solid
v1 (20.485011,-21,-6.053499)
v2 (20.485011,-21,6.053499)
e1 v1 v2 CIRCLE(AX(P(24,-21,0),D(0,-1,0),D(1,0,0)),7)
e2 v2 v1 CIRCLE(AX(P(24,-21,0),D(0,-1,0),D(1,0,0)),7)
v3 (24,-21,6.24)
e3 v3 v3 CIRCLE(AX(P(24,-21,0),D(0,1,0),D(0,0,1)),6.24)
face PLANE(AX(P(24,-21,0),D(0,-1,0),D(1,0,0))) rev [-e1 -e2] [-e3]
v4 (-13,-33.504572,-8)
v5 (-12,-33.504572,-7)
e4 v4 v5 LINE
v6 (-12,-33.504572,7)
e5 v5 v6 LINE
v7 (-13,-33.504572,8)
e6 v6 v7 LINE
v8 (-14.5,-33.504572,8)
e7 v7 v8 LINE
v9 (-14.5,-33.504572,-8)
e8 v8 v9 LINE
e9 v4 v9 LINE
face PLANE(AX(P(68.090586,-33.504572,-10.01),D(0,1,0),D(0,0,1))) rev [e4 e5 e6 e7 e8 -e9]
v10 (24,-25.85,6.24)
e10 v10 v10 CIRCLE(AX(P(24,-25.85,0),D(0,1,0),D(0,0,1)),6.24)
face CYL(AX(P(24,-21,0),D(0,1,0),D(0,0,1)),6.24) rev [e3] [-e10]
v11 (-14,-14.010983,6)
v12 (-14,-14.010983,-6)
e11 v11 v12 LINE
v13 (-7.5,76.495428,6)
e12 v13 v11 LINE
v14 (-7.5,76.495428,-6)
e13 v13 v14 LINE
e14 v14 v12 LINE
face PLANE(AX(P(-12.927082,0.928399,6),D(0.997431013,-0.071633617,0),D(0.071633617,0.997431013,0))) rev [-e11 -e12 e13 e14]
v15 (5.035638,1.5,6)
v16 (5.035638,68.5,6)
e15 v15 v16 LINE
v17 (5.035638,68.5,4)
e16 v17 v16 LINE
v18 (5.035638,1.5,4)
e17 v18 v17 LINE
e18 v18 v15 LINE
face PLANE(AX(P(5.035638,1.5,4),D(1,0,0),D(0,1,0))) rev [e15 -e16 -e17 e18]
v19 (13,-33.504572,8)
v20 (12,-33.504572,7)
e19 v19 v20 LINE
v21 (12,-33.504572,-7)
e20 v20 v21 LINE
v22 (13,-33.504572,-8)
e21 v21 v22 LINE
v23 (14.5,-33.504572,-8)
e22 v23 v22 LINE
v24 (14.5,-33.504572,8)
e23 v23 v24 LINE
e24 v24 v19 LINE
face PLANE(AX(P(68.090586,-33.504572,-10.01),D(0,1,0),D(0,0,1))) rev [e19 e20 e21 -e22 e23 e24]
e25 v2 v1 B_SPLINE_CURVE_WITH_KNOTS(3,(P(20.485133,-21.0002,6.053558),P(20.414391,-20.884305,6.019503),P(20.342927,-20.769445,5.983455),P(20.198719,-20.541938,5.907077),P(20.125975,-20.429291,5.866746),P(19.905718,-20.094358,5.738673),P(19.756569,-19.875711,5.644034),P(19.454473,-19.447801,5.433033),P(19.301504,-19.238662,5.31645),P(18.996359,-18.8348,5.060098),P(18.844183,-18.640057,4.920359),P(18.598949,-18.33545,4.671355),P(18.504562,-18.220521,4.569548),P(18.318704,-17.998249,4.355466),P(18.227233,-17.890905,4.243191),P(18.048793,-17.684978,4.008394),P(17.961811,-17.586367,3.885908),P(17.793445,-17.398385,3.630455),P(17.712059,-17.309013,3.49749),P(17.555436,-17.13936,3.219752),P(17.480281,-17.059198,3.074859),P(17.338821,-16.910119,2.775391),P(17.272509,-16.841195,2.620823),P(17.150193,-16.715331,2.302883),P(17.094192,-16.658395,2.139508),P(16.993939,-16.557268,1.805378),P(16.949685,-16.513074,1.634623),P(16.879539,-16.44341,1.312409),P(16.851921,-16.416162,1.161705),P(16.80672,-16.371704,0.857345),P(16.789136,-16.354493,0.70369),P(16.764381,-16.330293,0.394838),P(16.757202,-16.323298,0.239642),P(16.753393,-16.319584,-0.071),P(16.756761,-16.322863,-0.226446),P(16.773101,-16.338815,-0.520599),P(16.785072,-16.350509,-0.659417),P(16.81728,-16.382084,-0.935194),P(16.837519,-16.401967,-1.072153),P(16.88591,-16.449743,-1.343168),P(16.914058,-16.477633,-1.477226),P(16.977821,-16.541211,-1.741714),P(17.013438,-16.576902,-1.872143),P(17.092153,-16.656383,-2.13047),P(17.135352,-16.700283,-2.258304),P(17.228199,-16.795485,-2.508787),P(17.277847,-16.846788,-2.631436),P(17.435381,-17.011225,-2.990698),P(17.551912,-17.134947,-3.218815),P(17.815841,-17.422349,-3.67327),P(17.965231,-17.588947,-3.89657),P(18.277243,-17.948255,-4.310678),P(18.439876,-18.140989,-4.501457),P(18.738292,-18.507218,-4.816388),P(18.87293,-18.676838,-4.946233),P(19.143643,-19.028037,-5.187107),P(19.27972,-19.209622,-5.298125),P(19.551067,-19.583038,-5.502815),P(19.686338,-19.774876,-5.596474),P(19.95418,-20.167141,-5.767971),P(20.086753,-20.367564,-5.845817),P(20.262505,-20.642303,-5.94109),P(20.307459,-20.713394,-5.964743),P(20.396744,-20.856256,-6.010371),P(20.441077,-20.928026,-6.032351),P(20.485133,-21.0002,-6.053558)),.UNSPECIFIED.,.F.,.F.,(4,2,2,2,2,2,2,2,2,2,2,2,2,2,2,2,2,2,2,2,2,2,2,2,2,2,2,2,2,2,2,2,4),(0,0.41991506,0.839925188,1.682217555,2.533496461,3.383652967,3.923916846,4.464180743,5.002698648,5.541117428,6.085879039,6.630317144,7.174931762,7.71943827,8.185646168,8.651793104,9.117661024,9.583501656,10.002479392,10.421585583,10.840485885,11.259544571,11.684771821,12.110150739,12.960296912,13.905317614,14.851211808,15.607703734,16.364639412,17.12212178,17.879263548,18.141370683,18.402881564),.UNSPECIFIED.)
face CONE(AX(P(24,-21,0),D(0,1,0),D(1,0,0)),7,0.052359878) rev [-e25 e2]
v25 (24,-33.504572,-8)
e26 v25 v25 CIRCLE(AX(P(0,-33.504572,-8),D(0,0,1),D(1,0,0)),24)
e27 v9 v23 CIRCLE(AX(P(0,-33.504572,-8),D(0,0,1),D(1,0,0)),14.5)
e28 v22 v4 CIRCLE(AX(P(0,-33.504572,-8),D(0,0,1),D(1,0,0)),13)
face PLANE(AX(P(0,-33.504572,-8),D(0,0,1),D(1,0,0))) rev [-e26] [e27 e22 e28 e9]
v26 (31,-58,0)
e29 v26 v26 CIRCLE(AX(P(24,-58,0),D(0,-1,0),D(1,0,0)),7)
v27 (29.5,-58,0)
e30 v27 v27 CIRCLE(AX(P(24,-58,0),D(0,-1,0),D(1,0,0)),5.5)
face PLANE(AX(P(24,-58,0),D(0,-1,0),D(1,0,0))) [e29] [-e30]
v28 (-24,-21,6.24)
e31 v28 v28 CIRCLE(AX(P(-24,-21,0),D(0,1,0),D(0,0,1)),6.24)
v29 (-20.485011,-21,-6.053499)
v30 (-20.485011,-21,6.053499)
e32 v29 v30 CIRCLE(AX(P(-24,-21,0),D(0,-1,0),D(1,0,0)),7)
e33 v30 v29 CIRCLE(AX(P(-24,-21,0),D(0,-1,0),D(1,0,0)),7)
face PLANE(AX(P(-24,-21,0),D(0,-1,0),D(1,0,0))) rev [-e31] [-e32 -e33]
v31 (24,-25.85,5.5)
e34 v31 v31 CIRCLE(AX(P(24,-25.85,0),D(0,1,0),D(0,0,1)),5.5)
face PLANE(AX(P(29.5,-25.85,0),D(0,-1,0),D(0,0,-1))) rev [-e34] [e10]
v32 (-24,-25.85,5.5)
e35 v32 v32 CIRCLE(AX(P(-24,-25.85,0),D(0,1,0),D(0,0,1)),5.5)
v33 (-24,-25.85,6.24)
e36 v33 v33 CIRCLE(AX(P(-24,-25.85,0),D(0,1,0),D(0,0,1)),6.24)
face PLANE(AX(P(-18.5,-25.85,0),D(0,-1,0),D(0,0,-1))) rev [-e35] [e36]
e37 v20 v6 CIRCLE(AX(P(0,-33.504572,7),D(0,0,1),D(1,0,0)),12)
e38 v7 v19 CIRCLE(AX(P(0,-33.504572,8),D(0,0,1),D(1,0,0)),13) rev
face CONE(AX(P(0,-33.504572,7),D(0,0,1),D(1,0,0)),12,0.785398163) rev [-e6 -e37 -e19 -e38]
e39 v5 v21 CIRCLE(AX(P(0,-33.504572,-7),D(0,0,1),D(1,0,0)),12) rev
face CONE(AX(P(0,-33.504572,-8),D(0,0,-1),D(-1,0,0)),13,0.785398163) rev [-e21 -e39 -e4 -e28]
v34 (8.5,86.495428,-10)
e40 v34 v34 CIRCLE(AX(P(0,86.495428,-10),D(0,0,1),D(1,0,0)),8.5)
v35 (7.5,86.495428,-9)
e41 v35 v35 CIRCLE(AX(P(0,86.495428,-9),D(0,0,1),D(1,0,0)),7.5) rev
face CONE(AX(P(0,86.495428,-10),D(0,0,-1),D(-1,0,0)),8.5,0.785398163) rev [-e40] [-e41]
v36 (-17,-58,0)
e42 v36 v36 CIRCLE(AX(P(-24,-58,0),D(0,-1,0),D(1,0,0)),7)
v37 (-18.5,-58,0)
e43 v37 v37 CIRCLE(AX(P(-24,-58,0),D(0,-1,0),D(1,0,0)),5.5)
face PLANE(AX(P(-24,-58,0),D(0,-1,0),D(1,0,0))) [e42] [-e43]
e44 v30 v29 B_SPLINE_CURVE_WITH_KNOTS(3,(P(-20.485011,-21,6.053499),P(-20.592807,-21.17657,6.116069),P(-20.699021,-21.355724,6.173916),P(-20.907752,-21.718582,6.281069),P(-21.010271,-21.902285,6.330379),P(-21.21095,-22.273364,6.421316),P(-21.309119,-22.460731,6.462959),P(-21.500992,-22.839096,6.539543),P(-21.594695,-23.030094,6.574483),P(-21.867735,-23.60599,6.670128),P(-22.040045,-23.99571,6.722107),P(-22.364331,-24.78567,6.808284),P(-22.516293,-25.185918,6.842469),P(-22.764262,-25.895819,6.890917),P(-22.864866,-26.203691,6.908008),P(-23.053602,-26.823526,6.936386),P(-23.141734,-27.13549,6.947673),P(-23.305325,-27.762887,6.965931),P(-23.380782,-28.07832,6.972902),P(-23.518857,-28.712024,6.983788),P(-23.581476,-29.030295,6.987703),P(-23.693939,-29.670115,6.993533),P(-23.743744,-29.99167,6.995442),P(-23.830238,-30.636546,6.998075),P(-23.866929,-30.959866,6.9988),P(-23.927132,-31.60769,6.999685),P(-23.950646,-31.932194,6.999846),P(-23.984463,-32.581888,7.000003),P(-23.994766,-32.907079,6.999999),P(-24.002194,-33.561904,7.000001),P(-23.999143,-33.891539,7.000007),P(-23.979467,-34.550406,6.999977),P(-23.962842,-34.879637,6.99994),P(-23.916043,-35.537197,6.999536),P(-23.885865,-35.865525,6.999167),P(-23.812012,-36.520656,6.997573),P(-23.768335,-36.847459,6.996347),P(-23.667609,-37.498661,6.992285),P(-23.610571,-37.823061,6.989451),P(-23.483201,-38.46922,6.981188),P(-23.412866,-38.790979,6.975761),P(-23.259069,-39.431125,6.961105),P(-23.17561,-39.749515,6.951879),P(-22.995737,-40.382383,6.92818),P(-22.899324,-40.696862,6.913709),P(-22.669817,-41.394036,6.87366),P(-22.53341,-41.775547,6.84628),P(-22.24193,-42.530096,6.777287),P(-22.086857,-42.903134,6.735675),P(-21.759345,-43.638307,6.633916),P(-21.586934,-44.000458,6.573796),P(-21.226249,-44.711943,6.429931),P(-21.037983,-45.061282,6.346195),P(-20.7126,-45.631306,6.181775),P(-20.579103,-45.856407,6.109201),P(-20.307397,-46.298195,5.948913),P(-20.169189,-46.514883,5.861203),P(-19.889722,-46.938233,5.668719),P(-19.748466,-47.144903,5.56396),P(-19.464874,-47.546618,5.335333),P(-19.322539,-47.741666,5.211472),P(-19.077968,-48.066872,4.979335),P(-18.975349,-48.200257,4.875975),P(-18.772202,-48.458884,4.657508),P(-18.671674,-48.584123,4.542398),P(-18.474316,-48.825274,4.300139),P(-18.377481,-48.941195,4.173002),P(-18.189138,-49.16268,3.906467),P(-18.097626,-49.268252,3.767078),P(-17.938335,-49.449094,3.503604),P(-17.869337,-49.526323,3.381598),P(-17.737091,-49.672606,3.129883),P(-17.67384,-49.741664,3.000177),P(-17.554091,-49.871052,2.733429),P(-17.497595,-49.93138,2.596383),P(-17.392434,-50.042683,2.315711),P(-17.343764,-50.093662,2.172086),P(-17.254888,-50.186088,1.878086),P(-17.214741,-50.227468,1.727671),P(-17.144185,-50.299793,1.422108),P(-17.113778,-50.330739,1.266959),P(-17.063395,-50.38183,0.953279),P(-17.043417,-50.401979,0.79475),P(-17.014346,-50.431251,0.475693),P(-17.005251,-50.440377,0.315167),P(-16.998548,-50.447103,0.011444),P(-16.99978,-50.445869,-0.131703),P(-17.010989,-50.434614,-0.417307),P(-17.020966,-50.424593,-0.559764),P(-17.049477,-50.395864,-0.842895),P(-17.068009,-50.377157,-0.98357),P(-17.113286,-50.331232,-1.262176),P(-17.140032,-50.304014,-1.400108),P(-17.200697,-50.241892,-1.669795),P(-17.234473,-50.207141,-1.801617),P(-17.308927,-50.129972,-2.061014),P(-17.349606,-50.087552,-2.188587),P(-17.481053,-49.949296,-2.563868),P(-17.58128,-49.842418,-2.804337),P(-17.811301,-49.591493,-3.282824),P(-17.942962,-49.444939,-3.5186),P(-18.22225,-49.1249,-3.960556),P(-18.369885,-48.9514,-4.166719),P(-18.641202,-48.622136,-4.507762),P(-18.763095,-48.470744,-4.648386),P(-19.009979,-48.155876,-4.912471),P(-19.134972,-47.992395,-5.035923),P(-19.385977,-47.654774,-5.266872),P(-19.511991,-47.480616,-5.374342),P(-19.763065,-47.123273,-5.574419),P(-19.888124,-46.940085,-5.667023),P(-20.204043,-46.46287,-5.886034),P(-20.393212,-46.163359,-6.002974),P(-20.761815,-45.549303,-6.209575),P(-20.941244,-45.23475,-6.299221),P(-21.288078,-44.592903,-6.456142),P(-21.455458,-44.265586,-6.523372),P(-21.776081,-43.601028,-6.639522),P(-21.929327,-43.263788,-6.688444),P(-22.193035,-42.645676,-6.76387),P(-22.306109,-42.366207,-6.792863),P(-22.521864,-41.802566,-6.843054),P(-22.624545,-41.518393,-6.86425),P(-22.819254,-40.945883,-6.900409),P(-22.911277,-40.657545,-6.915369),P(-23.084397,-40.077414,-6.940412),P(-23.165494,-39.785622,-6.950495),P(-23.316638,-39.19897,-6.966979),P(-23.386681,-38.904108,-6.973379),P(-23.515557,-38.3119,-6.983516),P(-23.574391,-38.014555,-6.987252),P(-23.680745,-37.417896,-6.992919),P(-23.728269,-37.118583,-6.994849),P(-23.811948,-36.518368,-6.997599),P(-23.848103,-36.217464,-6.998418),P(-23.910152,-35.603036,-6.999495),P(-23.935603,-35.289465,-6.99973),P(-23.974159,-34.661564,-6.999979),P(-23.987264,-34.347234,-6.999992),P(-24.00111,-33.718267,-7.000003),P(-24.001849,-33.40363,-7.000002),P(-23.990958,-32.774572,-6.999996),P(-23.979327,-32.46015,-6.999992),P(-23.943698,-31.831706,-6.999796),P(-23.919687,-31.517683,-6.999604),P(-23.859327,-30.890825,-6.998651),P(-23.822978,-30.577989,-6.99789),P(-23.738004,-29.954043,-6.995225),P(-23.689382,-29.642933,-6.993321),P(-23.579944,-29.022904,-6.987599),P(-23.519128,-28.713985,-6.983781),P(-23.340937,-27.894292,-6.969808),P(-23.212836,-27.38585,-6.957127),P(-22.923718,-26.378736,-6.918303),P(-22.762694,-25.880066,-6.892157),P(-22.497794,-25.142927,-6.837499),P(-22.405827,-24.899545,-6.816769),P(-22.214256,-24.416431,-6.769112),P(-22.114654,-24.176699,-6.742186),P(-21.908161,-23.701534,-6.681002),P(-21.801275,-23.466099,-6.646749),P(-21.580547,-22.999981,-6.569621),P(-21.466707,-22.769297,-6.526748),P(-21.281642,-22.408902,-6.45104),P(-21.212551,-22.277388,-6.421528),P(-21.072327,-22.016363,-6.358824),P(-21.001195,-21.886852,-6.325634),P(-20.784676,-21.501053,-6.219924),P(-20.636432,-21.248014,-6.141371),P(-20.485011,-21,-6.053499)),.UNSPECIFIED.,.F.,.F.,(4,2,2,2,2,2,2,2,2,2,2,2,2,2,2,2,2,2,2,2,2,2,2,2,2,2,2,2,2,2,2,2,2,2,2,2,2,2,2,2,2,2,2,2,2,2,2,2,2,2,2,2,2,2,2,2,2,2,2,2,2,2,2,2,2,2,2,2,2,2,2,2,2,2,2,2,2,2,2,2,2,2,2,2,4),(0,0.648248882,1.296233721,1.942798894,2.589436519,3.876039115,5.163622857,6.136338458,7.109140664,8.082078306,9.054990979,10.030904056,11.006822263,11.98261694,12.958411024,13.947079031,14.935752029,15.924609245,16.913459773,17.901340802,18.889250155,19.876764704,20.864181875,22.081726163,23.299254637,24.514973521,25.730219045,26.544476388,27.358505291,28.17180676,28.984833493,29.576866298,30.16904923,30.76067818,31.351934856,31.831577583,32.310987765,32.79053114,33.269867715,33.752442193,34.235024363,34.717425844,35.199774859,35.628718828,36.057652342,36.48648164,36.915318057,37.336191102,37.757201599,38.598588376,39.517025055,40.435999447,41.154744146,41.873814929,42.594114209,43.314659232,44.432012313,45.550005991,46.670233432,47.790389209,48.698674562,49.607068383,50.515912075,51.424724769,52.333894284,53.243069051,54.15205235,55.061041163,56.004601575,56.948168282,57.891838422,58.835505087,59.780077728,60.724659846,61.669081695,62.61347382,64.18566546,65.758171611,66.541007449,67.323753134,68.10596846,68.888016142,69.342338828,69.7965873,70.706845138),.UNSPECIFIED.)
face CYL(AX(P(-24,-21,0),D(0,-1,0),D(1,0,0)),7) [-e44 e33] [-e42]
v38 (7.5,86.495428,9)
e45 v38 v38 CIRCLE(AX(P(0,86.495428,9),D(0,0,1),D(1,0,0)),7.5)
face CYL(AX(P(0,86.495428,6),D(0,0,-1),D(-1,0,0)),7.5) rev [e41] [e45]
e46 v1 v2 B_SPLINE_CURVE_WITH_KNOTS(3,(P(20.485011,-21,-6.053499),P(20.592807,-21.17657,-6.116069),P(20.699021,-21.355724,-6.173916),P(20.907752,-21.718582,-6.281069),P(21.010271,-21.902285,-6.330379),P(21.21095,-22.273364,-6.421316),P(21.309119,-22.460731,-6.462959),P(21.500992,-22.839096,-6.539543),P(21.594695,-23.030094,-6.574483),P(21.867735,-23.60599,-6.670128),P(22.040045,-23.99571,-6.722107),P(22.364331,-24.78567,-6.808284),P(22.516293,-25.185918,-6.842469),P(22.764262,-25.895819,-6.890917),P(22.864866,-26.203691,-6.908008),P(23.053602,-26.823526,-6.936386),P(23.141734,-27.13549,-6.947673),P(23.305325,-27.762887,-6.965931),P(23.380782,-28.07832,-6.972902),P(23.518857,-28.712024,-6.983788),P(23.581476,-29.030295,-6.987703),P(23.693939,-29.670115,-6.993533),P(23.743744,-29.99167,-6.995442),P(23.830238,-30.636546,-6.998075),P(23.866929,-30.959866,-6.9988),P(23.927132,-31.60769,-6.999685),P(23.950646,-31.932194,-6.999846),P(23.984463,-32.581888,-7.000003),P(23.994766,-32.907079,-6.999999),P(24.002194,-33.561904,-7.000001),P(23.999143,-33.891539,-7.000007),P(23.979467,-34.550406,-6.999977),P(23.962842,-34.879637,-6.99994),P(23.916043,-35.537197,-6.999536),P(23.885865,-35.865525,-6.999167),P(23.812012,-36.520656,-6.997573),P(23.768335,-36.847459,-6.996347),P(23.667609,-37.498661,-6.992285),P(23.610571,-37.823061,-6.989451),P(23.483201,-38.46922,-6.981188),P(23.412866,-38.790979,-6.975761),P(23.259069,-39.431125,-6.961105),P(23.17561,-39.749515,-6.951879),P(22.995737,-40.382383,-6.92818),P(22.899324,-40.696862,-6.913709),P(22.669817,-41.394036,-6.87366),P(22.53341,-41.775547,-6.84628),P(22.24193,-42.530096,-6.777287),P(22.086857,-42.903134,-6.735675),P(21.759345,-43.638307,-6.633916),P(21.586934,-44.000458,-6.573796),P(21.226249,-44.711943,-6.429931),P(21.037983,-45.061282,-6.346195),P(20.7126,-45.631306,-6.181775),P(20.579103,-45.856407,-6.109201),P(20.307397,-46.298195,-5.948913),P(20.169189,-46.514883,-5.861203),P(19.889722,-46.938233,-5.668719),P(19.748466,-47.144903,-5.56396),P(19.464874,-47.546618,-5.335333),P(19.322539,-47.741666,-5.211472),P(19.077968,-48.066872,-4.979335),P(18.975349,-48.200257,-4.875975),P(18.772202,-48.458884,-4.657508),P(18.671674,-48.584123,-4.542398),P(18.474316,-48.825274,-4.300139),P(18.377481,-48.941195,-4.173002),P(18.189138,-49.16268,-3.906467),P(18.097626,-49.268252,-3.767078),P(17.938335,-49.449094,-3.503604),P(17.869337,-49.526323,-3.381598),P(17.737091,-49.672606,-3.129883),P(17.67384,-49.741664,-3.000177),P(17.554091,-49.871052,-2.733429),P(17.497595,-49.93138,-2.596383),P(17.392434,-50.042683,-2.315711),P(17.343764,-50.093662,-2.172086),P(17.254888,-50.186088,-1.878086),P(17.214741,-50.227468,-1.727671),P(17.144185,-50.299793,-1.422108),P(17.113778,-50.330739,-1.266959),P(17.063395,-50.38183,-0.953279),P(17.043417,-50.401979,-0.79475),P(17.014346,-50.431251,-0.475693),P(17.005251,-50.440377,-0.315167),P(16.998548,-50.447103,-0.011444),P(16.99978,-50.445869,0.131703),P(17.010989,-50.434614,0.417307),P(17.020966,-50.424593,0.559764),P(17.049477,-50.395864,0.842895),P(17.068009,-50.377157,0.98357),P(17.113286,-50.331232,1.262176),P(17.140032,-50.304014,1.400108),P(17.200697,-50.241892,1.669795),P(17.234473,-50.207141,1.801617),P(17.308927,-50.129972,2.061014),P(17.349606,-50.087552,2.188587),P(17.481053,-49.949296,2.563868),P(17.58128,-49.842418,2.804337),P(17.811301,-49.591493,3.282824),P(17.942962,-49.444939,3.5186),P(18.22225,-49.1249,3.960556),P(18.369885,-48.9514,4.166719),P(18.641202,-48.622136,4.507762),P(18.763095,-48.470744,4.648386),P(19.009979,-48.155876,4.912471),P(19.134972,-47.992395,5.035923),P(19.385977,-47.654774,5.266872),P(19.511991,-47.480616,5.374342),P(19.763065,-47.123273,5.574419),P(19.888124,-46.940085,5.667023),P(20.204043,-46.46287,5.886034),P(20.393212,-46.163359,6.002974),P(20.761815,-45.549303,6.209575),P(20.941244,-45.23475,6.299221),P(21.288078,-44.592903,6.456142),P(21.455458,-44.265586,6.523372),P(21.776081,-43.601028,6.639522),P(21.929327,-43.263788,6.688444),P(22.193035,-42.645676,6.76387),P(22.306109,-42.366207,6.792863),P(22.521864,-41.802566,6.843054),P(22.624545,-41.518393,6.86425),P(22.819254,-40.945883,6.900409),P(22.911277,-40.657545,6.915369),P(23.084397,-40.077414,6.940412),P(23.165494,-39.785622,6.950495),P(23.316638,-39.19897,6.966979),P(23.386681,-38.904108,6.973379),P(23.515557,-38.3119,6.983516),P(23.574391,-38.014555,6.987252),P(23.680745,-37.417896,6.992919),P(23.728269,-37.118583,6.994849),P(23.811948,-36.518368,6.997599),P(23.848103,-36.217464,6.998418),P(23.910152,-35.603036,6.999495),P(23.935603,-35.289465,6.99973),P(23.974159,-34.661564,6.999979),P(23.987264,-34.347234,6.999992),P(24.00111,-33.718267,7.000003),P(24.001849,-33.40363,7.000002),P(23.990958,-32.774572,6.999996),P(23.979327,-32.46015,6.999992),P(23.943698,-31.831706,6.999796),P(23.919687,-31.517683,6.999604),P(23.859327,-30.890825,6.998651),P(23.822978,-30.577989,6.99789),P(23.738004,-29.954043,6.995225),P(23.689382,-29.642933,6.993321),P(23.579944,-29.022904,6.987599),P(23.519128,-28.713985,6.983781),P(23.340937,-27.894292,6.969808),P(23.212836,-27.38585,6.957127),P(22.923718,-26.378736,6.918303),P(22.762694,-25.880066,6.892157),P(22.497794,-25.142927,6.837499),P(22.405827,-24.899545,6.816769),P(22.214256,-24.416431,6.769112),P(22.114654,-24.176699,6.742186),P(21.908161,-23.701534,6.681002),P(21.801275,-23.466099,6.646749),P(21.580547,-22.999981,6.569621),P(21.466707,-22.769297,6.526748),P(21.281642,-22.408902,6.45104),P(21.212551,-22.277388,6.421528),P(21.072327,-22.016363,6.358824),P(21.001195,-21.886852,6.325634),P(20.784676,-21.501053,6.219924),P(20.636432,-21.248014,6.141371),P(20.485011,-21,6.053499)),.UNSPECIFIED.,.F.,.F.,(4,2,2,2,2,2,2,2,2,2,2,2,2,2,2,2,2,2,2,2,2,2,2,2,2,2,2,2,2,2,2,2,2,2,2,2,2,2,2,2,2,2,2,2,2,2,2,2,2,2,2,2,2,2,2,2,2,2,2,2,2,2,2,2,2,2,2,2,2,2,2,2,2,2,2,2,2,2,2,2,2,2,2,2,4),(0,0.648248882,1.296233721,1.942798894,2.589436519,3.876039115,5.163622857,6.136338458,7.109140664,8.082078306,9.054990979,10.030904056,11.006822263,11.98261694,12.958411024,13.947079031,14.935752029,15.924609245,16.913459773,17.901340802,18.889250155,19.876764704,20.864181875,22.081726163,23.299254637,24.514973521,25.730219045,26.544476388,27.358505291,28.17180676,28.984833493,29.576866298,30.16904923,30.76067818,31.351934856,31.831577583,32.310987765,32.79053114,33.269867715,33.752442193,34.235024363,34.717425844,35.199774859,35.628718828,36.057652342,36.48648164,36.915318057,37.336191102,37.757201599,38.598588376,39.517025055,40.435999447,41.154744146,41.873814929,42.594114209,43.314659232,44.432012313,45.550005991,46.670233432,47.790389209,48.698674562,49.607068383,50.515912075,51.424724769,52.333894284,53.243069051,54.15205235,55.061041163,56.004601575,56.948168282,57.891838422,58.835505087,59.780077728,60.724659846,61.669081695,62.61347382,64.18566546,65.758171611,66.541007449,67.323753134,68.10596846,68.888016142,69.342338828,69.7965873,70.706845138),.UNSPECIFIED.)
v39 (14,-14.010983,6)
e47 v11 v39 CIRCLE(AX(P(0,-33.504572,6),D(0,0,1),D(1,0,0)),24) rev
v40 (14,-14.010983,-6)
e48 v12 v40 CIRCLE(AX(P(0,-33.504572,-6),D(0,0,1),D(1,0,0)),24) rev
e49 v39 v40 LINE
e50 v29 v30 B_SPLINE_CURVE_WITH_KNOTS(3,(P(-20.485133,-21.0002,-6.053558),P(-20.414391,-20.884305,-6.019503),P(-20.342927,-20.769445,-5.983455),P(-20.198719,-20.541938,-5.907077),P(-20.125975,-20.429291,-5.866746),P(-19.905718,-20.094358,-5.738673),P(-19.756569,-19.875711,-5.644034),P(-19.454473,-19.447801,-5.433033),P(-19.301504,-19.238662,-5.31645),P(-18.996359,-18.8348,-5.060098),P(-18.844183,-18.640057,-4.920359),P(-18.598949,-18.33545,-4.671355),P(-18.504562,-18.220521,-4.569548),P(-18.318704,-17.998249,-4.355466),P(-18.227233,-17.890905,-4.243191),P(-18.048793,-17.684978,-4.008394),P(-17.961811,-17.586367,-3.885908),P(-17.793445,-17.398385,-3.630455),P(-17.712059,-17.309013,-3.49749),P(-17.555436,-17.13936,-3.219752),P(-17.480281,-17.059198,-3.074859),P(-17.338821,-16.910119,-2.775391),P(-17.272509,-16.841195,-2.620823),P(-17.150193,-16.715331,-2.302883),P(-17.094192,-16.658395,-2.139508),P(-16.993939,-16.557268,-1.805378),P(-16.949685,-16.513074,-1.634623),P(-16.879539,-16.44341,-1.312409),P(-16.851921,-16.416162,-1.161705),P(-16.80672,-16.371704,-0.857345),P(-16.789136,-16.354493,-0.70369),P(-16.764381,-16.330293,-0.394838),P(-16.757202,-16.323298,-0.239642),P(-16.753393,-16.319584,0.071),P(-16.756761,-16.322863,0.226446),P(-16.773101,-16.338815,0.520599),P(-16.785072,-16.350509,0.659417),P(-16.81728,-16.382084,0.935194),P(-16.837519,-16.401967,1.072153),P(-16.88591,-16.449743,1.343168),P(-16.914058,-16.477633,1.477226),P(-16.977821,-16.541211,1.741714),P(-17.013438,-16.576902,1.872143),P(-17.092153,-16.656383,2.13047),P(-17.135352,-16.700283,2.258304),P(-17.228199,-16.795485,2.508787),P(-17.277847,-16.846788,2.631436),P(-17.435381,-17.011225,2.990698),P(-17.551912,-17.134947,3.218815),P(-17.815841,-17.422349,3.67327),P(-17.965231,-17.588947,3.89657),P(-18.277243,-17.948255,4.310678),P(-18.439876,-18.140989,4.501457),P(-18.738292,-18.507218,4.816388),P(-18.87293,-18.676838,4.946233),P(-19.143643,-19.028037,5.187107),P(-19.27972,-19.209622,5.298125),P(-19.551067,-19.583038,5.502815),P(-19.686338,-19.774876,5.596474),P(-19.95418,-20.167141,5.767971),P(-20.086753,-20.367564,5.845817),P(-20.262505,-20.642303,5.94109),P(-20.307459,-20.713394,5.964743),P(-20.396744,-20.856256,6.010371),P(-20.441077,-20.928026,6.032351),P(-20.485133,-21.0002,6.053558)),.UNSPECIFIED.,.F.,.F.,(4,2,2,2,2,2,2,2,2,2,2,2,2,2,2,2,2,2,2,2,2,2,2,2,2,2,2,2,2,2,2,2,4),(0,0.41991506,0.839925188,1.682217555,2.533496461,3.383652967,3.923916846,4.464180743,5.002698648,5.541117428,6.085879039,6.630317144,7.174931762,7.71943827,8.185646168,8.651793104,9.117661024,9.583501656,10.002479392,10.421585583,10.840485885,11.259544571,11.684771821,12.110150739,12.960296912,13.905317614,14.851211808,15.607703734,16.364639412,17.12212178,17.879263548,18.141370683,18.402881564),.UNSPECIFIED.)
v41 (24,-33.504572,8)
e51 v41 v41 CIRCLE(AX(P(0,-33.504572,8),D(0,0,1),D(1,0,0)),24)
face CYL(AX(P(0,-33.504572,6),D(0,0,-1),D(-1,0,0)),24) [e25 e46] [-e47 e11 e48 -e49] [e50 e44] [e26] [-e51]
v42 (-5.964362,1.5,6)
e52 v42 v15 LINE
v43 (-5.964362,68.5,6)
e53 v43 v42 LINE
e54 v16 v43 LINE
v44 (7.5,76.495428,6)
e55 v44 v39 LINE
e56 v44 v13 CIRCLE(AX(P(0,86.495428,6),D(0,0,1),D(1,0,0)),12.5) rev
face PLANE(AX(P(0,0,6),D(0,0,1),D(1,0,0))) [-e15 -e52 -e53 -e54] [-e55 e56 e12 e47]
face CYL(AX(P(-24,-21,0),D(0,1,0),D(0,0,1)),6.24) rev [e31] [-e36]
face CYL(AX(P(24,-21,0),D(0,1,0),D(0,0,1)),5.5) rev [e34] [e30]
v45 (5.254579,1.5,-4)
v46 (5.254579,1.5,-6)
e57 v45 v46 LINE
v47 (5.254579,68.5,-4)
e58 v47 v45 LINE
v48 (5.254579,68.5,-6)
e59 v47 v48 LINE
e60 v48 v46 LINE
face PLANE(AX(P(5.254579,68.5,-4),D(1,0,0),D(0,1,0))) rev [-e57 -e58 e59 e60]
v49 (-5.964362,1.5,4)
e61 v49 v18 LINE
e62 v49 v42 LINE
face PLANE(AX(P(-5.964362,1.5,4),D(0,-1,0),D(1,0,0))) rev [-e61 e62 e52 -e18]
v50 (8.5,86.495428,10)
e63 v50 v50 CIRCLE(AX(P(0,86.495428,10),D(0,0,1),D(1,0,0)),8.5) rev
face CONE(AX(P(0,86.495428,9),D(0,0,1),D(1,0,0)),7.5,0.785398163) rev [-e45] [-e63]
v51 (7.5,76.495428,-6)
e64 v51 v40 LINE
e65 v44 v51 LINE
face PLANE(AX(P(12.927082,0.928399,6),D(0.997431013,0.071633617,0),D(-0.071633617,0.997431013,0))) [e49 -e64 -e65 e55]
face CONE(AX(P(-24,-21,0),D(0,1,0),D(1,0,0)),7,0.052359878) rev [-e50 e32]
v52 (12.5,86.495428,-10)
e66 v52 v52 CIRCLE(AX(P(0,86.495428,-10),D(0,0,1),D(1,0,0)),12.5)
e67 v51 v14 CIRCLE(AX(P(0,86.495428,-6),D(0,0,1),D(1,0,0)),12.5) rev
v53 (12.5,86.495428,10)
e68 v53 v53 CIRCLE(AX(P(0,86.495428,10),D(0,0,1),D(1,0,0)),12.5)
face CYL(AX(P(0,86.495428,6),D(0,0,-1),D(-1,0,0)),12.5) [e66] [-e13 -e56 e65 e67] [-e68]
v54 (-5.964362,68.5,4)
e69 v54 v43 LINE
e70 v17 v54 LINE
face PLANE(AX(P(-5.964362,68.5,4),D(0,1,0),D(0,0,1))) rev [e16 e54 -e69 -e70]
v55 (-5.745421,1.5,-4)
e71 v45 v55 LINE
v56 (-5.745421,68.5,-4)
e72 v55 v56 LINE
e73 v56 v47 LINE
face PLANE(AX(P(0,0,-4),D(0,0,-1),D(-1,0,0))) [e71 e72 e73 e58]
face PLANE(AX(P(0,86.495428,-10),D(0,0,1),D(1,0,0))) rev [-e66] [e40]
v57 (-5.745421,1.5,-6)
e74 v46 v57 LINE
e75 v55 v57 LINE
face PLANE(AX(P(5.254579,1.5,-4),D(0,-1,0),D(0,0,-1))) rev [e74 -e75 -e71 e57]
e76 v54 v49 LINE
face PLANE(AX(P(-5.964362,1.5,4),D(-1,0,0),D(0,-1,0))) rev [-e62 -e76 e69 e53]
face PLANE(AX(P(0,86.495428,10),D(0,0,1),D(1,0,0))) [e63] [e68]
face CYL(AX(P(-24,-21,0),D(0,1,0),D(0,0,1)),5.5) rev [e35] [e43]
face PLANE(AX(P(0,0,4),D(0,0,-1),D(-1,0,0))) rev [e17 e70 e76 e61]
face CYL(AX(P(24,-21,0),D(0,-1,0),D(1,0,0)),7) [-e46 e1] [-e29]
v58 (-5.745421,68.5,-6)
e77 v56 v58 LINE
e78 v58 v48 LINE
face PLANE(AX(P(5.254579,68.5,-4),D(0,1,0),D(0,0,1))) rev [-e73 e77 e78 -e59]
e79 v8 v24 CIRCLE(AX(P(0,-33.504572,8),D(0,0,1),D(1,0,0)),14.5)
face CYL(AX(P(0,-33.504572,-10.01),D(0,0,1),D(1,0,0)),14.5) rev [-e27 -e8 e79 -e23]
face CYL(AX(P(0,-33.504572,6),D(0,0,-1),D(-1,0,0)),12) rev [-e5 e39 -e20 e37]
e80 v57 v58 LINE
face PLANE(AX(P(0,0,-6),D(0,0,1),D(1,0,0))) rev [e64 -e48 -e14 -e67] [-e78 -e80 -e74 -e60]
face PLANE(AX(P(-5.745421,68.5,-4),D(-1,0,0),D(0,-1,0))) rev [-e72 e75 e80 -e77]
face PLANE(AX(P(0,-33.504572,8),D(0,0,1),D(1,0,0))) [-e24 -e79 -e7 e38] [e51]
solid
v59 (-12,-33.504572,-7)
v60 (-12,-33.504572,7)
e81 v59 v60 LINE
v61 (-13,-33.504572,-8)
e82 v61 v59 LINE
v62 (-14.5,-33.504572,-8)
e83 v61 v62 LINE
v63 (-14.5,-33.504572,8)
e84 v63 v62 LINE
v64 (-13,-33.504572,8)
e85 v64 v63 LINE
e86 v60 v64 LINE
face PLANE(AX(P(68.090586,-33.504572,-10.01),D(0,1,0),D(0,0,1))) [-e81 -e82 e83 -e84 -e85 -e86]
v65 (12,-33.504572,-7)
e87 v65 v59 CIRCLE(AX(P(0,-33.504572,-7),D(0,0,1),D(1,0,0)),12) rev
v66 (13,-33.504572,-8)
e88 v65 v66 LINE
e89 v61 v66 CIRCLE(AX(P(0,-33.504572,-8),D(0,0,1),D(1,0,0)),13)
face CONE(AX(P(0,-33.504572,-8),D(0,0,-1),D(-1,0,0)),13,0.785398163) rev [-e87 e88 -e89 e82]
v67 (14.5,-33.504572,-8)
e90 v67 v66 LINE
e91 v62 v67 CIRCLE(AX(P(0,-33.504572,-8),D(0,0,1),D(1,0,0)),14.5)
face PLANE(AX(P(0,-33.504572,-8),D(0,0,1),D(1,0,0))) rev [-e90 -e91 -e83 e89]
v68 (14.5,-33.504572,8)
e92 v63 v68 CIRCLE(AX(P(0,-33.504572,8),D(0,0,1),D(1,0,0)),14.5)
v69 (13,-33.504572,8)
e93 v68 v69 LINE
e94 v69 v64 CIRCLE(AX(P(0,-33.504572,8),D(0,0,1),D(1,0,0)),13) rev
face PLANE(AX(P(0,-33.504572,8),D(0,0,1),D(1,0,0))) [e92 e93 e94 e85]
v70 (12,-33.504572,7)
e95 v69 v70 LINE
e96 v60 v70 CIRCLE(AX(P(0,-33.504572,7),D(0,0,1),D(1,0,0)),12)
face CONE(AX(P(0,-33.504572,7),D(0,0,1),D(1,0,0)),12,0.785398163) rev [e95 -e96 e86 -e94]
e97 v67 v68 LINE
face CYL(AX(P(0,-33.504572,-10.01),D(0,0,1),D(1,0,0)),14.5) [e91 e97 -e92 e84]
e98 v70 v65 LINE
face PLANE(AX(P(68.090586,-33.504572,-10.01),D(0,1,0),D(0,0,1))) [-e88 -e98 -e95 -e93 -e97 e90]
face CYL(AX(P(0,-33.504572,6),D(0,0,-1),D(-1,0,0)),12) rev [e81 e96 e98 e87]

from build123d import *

# Parameters (mm, degrees)
SKETCH1_R                                = 12.5
SKETCH1_R_2                              = 7.5
SKETCH1_R_3                              = 24
SKETCH1_R_4                              = 12
BOSS_EXTRUDE1_DEPTH                      = 6
SKETCH2_R                                = 24
SKETCH2_R_2                              = 12
BOSS_EXTRUDE3_DEPTH                      = 8
SKETCH3_R                                = 12.5
SKETCH3_R_2                              = 7.5
BOSS_EXTRUDE4_DEPTH                      = 10
SKETCH5_R                                = 7
BOSS_EXTRUDE5_DEPTH                      = 37
CUT_EXTRUDE1_START                       = -37
SKETCH5_2_R                              = 7
CUT_EXTRUDE1_DEPTH                       = 37
CUT_EXTRUDE1_DRAFT                       = 3
CUT_EXTRUDE1_PROFILE_2_DEPTH             = 37
CUT_EXTRUDE1_PROFILE_2_DRAFT             = 3
CBORE_FOR_M10_HEX_HEAD_BOLT2_D           = 11
CBORE_FOR_M10_HEX_HEAD_BOLT2_DEPTH       = 42.4
CBORE_FOR_M10_HEX_HEAD_BOLT2_CBORE_D     = 12.48
CBORE_FOR_M10_HEX_HEAD_BOLT2_CBORE_DEPTH = 4.85
CBORE_FOR_M10_HEX_HEAD_BOLT2_TIP         = 3.304733405
SKETCH10_W                               = 11
SKETCH10_H                               = 67
CUT_EXTRUDE2_DEPTH                       = 2
SKETCH11_W                               = 11
SKETCH11_H                               = 67
CUT_EXTRUDE3_DEPTH                       = 2
CHAMFER1_SIZE                            = 1
CHAMFER2_SIZE                            = 1
SPLIT1_START                             = -8
SPLIT1_DEPTH                             = 16
SPLIT1_2_ANGLE                           = 180


# Read off the part's stored shape, not the designer's step: Split1
with BuildPart() as part:
    # Sketch1 → Boss-Extrude1 (new, symmetric)
    # profile 1 of 3: a face of its own
    with BuildSketch(Plane.XY):
        with Locations((0, 86.495427945)):
            Circle(SKETCH1_R)
        with Locations((0, 86.495427945)):
            Circle(SKETCH1_R_2, mode=Mode.SUBTRACT)
    # profile 2 of 3: a face of its own
    with BuildSketch(Plane.XY):
        with Locations((0, -33.504572055)):
            Circle(SKETCH1_R_3)
        with Locations((0, -33.504572055)):
            Circle(SKETCH1_R_4, mode=Mode.SUBTRACT)
    # profile 3 of 3: a face of its own
    with BuildSketch(Plane.XY):
        with BuildLine():
            Line((-7.5, 76.495427945), (-14, -14.010983366))
            ThreePointArc((-14, -14.010983366), (0, -9.504572055), (14, -14.010983366))
            Line((14, -14.010983366), (7.5, 76.495427945))
            ThreePointArc((7.5, 76.495427945), (0, 73.995427945), (-7.5, 76.495427945))
        make_face()
    extrude(amount=BOSS_EXTRUDE1_DEPTH, both=True)

    # Sketch2 → Boss-Extrude3 (add, symmetric)
    with BuildSketch(Plane.XY):
        with Locations((0, -33.504572055)):
            Circle(SKETCH2_R)
        with Locations((0, -33.504572055)):
            Circle(SKETCH2_R_2, mode=Mode.SUBTRACT)
    extrude(amount=BOSS_EXTRUDE3_DEPTH, both=True)

    # Sketch3 → Boss-Extrude4 (add, symmetric)
    with BuildSketch(Plane.XY):
        with Locations((0, 86.495427945)):
            Circle(SKETCH3_R)
        with Locations((0, 86.495427945)):
            Circle(SKETCH3_R_2, mode=Mode.SUBTRACT)
    extrude(amount=BOSS_EXTRUDE4_DEPTH, both=True)

    # Sketch5 → Boss-Extrude5 (add)
    with BuildSketch(Plane(origin=(0, -58, 0), x_dir=(-1, 0, 0), z_dir=(0, -1, 0))):
        with Locations(Location((-24, 0, 0), (0, 0, 180))):
            Circle(SKETCH5_R)
        with Locations(Location((24, 0, 0), (0, 0, 180))):
            Circle(SKETCH5_R)
    extrude(amount=-BOSS_EXTRUDE5_DEPTH)


with BuildPart() as cut_extrude1_tool:
    # Sketch5<2> → Cut-Extrude1 (with draft: the straight prism first)
    with BuildSketch(Plane(origin=(0, -58, 0), x_dir=(-1, 0, 0), z_dir=(0, -1, 0)).offset(CUT_EXTRUDE1_START)):
        with Locations(Location((-24, 0, 0), (0, 0, 180))):
            Circle(SKETCH5_2_R)
    extrude(amount=-CUT_EXTRUDE1_DEPTH)
    # Cut-Extrude1: the draft: its side faces are tilted about the plane it starts from
    cut_extrude1_sides = [cut_extrude1_tool.faces().sort_by_distance(p)[0] for p in [
        (17, -2.5, 0),
    ]]
    draft(cut_extrude1_sides, Plane(origin=(0, -58, 0), x_dir=(-1, 0, 0), z_dir=(0, -1, 0)).offset(CUT_EXTRUDE1_START), CUT_EXTRUDE1_DRAFT)


with BuildPart() as part_1:
    add(part.part)

    # Cut-Extrude1: cut by cut_extrude1_tool
    add(cut_extrude1_tool.part, mode=Mode.SUBTRACT)


with BuildPart() as cut_extrude1_profile_2_tool:
    # Sketch5<2> → Cut-Extrude1 profile 2 (with draft: the straight prism first)
    with BuildSketch(Plane(origin=(0, -58, 0), x_dir=(-1, 0, 0), z_dir=(0, -1, 0)).offset(CUT_EXTRUDE1_START)):
        with Locations(Location((24, 0, 0), (0, 0, 180))):
            Circle(SKETCH5_2_R)
    extrude(amount=-CUT_EXTRUDE1_PROFILE_2_DEPTH)
    # Cut-Extrude1 profile 2: the draft: its side faces are tilted about the plane it starts from
    cut_extrude1_profile_2_sides = [cut_extrude1_profile_2_tool.faces().sort_by_distance(p)[0] for p in [
        (-31, -2.5, 0),
    ]]
    draft(cut_extrude1_profile_2_sides, Plane(origin=(0, -58, 0), x_dir=(-1, 0, 0), z_dir=(0, -1, 0)).offset(CUT_EXTRUDE1_START), CUT_EXTRUDE1_PROFILE_2_DRAFT)


with BuildPart() as part_2:
    add(part_1.part)

    # Cut-Extrude1 profile 2: cut by cut_extrude1_profile_2_tool
    add(cut_extrude1_profile_2_tool.part, mode=Mode.SUBTRACT)

    # CBORE for M10 Hex Head Bolt2
    with Locations(Plane(origin=(0, -21, 0), x_dir=(1, 0, 0), z_dir=(0, 1, 0))):
        with Locations((-24, 0), (24, 0)):
            CounterBoreHole(CBORE_FOR_M10_HEX_HEAD_BOLT2_D / 2, CBORE_FOR_M10_HEX_HEAD_BOLT2_CBORE_D / 2, CBORE_FOR_M10_HEX_HEAD_BOLT2_CBORE_DEPTH, depth=CBORE_FOR_M10_HEX_HEAD_BOLT2_DEPTH)
            with Locations((0, 0, -(CBORE_FOR_M10_HEX_HEAD_BOLT2_DEPTH + CBORE_FOR_M10_HEX_HEAD_BOLT2_TIP / 2))):  # 118° drill point
                Cone(0, CBORE_FOR_M10_HEX_HEAD_BOLT2_D / 2, CBORE_FOR_M10_HEX_HEAD_BOLT2_TIP, mode=Mode.SUBTRACT)

    # Sketch10 → Cut-Extrude2 (cut)
    with BuildSketch(Plane(origin=(0, 0, -6), x_dir=(-1, 0, 0), z_dir=(0, 0, -1))):
        with Locations((0.245421027, 35)):
            Rectangle(SKETCH10_W, SKETCH10_H)
    extrude(amount=-CUT_EXTRUDE2_DEPTH, mode=Mode.SUBTRACT)

    # Sketch11 → Cut-Extrude3 (cut)
    with BuildSketch(Plane.XY.offset(6)):
        with Locations((-0.464361818, 35)):
            Rectangle(SKETCH11_W, SKETCH11_H)
    extrude(amount=-CUT_EXTRUDE3_DEPTH, mode=Mode.SUBTRACT)

    # Chamfer1
    chamfer1_edges = [part_2.edges().sort_by_distance(p)[0] for p in [
        (-12, -33.504572055, -8),
        (-12, -33.504572055, 8),
    ]]
    chamfer(chamfer1_edges, length=CHAMFER1_SIZE)

    # Chamfer2
    chamfer2_edges = [part_2.edges().sort_by_distance(p)[0] for p in [
        (-7.5, 86.495427945, -10),
        (-7.5, 86.495427945, 10),
    ]]
    chamfer(chamfer2_edges, length=CHAMFER2_SIZE)

    # Split1 outline → Split1 (cut)
    with BuildSketch(Plane.XY.offset(SPLIT1_START)):
        with BuildLine():
            Line((-12, -33.504572055), (-14.5, -33.504572055))
            ThreePointArc((-14.5, -33.504572055), (0, -48.004572055), (14.5, -33.504572055))
            Line((14.5, -33.504572055), (12, -33.504572055))
            ThreePointArc((12, -33.504572055), (0, -45.504572055), (-12, -33.504572055))
        make_face()
    extrude(amount=SPLIT1_DEPTH, mode=Mode.SUBTRACT)


with BuildPart() as body_2:
    # Split1 2 outline → Split1 2 (revolve)
    with BuildSketch(Plane(origin=(0, -33.504572055, 0), x_dir=(-1, 0, 0), z_dir=(0, 1, 0))):
        Polygon((13, -8), (14.5, -8), (14.5, 8), (13, 8), (12, 7), (12, -7), align=None)
    revolve(axis=Axis((0, -33.504572055, 0), (0, 0, 1)), revolution_arc=SPLIT1_2_ANGLE)


solid = Compound([part_2.part, body_2.part])
